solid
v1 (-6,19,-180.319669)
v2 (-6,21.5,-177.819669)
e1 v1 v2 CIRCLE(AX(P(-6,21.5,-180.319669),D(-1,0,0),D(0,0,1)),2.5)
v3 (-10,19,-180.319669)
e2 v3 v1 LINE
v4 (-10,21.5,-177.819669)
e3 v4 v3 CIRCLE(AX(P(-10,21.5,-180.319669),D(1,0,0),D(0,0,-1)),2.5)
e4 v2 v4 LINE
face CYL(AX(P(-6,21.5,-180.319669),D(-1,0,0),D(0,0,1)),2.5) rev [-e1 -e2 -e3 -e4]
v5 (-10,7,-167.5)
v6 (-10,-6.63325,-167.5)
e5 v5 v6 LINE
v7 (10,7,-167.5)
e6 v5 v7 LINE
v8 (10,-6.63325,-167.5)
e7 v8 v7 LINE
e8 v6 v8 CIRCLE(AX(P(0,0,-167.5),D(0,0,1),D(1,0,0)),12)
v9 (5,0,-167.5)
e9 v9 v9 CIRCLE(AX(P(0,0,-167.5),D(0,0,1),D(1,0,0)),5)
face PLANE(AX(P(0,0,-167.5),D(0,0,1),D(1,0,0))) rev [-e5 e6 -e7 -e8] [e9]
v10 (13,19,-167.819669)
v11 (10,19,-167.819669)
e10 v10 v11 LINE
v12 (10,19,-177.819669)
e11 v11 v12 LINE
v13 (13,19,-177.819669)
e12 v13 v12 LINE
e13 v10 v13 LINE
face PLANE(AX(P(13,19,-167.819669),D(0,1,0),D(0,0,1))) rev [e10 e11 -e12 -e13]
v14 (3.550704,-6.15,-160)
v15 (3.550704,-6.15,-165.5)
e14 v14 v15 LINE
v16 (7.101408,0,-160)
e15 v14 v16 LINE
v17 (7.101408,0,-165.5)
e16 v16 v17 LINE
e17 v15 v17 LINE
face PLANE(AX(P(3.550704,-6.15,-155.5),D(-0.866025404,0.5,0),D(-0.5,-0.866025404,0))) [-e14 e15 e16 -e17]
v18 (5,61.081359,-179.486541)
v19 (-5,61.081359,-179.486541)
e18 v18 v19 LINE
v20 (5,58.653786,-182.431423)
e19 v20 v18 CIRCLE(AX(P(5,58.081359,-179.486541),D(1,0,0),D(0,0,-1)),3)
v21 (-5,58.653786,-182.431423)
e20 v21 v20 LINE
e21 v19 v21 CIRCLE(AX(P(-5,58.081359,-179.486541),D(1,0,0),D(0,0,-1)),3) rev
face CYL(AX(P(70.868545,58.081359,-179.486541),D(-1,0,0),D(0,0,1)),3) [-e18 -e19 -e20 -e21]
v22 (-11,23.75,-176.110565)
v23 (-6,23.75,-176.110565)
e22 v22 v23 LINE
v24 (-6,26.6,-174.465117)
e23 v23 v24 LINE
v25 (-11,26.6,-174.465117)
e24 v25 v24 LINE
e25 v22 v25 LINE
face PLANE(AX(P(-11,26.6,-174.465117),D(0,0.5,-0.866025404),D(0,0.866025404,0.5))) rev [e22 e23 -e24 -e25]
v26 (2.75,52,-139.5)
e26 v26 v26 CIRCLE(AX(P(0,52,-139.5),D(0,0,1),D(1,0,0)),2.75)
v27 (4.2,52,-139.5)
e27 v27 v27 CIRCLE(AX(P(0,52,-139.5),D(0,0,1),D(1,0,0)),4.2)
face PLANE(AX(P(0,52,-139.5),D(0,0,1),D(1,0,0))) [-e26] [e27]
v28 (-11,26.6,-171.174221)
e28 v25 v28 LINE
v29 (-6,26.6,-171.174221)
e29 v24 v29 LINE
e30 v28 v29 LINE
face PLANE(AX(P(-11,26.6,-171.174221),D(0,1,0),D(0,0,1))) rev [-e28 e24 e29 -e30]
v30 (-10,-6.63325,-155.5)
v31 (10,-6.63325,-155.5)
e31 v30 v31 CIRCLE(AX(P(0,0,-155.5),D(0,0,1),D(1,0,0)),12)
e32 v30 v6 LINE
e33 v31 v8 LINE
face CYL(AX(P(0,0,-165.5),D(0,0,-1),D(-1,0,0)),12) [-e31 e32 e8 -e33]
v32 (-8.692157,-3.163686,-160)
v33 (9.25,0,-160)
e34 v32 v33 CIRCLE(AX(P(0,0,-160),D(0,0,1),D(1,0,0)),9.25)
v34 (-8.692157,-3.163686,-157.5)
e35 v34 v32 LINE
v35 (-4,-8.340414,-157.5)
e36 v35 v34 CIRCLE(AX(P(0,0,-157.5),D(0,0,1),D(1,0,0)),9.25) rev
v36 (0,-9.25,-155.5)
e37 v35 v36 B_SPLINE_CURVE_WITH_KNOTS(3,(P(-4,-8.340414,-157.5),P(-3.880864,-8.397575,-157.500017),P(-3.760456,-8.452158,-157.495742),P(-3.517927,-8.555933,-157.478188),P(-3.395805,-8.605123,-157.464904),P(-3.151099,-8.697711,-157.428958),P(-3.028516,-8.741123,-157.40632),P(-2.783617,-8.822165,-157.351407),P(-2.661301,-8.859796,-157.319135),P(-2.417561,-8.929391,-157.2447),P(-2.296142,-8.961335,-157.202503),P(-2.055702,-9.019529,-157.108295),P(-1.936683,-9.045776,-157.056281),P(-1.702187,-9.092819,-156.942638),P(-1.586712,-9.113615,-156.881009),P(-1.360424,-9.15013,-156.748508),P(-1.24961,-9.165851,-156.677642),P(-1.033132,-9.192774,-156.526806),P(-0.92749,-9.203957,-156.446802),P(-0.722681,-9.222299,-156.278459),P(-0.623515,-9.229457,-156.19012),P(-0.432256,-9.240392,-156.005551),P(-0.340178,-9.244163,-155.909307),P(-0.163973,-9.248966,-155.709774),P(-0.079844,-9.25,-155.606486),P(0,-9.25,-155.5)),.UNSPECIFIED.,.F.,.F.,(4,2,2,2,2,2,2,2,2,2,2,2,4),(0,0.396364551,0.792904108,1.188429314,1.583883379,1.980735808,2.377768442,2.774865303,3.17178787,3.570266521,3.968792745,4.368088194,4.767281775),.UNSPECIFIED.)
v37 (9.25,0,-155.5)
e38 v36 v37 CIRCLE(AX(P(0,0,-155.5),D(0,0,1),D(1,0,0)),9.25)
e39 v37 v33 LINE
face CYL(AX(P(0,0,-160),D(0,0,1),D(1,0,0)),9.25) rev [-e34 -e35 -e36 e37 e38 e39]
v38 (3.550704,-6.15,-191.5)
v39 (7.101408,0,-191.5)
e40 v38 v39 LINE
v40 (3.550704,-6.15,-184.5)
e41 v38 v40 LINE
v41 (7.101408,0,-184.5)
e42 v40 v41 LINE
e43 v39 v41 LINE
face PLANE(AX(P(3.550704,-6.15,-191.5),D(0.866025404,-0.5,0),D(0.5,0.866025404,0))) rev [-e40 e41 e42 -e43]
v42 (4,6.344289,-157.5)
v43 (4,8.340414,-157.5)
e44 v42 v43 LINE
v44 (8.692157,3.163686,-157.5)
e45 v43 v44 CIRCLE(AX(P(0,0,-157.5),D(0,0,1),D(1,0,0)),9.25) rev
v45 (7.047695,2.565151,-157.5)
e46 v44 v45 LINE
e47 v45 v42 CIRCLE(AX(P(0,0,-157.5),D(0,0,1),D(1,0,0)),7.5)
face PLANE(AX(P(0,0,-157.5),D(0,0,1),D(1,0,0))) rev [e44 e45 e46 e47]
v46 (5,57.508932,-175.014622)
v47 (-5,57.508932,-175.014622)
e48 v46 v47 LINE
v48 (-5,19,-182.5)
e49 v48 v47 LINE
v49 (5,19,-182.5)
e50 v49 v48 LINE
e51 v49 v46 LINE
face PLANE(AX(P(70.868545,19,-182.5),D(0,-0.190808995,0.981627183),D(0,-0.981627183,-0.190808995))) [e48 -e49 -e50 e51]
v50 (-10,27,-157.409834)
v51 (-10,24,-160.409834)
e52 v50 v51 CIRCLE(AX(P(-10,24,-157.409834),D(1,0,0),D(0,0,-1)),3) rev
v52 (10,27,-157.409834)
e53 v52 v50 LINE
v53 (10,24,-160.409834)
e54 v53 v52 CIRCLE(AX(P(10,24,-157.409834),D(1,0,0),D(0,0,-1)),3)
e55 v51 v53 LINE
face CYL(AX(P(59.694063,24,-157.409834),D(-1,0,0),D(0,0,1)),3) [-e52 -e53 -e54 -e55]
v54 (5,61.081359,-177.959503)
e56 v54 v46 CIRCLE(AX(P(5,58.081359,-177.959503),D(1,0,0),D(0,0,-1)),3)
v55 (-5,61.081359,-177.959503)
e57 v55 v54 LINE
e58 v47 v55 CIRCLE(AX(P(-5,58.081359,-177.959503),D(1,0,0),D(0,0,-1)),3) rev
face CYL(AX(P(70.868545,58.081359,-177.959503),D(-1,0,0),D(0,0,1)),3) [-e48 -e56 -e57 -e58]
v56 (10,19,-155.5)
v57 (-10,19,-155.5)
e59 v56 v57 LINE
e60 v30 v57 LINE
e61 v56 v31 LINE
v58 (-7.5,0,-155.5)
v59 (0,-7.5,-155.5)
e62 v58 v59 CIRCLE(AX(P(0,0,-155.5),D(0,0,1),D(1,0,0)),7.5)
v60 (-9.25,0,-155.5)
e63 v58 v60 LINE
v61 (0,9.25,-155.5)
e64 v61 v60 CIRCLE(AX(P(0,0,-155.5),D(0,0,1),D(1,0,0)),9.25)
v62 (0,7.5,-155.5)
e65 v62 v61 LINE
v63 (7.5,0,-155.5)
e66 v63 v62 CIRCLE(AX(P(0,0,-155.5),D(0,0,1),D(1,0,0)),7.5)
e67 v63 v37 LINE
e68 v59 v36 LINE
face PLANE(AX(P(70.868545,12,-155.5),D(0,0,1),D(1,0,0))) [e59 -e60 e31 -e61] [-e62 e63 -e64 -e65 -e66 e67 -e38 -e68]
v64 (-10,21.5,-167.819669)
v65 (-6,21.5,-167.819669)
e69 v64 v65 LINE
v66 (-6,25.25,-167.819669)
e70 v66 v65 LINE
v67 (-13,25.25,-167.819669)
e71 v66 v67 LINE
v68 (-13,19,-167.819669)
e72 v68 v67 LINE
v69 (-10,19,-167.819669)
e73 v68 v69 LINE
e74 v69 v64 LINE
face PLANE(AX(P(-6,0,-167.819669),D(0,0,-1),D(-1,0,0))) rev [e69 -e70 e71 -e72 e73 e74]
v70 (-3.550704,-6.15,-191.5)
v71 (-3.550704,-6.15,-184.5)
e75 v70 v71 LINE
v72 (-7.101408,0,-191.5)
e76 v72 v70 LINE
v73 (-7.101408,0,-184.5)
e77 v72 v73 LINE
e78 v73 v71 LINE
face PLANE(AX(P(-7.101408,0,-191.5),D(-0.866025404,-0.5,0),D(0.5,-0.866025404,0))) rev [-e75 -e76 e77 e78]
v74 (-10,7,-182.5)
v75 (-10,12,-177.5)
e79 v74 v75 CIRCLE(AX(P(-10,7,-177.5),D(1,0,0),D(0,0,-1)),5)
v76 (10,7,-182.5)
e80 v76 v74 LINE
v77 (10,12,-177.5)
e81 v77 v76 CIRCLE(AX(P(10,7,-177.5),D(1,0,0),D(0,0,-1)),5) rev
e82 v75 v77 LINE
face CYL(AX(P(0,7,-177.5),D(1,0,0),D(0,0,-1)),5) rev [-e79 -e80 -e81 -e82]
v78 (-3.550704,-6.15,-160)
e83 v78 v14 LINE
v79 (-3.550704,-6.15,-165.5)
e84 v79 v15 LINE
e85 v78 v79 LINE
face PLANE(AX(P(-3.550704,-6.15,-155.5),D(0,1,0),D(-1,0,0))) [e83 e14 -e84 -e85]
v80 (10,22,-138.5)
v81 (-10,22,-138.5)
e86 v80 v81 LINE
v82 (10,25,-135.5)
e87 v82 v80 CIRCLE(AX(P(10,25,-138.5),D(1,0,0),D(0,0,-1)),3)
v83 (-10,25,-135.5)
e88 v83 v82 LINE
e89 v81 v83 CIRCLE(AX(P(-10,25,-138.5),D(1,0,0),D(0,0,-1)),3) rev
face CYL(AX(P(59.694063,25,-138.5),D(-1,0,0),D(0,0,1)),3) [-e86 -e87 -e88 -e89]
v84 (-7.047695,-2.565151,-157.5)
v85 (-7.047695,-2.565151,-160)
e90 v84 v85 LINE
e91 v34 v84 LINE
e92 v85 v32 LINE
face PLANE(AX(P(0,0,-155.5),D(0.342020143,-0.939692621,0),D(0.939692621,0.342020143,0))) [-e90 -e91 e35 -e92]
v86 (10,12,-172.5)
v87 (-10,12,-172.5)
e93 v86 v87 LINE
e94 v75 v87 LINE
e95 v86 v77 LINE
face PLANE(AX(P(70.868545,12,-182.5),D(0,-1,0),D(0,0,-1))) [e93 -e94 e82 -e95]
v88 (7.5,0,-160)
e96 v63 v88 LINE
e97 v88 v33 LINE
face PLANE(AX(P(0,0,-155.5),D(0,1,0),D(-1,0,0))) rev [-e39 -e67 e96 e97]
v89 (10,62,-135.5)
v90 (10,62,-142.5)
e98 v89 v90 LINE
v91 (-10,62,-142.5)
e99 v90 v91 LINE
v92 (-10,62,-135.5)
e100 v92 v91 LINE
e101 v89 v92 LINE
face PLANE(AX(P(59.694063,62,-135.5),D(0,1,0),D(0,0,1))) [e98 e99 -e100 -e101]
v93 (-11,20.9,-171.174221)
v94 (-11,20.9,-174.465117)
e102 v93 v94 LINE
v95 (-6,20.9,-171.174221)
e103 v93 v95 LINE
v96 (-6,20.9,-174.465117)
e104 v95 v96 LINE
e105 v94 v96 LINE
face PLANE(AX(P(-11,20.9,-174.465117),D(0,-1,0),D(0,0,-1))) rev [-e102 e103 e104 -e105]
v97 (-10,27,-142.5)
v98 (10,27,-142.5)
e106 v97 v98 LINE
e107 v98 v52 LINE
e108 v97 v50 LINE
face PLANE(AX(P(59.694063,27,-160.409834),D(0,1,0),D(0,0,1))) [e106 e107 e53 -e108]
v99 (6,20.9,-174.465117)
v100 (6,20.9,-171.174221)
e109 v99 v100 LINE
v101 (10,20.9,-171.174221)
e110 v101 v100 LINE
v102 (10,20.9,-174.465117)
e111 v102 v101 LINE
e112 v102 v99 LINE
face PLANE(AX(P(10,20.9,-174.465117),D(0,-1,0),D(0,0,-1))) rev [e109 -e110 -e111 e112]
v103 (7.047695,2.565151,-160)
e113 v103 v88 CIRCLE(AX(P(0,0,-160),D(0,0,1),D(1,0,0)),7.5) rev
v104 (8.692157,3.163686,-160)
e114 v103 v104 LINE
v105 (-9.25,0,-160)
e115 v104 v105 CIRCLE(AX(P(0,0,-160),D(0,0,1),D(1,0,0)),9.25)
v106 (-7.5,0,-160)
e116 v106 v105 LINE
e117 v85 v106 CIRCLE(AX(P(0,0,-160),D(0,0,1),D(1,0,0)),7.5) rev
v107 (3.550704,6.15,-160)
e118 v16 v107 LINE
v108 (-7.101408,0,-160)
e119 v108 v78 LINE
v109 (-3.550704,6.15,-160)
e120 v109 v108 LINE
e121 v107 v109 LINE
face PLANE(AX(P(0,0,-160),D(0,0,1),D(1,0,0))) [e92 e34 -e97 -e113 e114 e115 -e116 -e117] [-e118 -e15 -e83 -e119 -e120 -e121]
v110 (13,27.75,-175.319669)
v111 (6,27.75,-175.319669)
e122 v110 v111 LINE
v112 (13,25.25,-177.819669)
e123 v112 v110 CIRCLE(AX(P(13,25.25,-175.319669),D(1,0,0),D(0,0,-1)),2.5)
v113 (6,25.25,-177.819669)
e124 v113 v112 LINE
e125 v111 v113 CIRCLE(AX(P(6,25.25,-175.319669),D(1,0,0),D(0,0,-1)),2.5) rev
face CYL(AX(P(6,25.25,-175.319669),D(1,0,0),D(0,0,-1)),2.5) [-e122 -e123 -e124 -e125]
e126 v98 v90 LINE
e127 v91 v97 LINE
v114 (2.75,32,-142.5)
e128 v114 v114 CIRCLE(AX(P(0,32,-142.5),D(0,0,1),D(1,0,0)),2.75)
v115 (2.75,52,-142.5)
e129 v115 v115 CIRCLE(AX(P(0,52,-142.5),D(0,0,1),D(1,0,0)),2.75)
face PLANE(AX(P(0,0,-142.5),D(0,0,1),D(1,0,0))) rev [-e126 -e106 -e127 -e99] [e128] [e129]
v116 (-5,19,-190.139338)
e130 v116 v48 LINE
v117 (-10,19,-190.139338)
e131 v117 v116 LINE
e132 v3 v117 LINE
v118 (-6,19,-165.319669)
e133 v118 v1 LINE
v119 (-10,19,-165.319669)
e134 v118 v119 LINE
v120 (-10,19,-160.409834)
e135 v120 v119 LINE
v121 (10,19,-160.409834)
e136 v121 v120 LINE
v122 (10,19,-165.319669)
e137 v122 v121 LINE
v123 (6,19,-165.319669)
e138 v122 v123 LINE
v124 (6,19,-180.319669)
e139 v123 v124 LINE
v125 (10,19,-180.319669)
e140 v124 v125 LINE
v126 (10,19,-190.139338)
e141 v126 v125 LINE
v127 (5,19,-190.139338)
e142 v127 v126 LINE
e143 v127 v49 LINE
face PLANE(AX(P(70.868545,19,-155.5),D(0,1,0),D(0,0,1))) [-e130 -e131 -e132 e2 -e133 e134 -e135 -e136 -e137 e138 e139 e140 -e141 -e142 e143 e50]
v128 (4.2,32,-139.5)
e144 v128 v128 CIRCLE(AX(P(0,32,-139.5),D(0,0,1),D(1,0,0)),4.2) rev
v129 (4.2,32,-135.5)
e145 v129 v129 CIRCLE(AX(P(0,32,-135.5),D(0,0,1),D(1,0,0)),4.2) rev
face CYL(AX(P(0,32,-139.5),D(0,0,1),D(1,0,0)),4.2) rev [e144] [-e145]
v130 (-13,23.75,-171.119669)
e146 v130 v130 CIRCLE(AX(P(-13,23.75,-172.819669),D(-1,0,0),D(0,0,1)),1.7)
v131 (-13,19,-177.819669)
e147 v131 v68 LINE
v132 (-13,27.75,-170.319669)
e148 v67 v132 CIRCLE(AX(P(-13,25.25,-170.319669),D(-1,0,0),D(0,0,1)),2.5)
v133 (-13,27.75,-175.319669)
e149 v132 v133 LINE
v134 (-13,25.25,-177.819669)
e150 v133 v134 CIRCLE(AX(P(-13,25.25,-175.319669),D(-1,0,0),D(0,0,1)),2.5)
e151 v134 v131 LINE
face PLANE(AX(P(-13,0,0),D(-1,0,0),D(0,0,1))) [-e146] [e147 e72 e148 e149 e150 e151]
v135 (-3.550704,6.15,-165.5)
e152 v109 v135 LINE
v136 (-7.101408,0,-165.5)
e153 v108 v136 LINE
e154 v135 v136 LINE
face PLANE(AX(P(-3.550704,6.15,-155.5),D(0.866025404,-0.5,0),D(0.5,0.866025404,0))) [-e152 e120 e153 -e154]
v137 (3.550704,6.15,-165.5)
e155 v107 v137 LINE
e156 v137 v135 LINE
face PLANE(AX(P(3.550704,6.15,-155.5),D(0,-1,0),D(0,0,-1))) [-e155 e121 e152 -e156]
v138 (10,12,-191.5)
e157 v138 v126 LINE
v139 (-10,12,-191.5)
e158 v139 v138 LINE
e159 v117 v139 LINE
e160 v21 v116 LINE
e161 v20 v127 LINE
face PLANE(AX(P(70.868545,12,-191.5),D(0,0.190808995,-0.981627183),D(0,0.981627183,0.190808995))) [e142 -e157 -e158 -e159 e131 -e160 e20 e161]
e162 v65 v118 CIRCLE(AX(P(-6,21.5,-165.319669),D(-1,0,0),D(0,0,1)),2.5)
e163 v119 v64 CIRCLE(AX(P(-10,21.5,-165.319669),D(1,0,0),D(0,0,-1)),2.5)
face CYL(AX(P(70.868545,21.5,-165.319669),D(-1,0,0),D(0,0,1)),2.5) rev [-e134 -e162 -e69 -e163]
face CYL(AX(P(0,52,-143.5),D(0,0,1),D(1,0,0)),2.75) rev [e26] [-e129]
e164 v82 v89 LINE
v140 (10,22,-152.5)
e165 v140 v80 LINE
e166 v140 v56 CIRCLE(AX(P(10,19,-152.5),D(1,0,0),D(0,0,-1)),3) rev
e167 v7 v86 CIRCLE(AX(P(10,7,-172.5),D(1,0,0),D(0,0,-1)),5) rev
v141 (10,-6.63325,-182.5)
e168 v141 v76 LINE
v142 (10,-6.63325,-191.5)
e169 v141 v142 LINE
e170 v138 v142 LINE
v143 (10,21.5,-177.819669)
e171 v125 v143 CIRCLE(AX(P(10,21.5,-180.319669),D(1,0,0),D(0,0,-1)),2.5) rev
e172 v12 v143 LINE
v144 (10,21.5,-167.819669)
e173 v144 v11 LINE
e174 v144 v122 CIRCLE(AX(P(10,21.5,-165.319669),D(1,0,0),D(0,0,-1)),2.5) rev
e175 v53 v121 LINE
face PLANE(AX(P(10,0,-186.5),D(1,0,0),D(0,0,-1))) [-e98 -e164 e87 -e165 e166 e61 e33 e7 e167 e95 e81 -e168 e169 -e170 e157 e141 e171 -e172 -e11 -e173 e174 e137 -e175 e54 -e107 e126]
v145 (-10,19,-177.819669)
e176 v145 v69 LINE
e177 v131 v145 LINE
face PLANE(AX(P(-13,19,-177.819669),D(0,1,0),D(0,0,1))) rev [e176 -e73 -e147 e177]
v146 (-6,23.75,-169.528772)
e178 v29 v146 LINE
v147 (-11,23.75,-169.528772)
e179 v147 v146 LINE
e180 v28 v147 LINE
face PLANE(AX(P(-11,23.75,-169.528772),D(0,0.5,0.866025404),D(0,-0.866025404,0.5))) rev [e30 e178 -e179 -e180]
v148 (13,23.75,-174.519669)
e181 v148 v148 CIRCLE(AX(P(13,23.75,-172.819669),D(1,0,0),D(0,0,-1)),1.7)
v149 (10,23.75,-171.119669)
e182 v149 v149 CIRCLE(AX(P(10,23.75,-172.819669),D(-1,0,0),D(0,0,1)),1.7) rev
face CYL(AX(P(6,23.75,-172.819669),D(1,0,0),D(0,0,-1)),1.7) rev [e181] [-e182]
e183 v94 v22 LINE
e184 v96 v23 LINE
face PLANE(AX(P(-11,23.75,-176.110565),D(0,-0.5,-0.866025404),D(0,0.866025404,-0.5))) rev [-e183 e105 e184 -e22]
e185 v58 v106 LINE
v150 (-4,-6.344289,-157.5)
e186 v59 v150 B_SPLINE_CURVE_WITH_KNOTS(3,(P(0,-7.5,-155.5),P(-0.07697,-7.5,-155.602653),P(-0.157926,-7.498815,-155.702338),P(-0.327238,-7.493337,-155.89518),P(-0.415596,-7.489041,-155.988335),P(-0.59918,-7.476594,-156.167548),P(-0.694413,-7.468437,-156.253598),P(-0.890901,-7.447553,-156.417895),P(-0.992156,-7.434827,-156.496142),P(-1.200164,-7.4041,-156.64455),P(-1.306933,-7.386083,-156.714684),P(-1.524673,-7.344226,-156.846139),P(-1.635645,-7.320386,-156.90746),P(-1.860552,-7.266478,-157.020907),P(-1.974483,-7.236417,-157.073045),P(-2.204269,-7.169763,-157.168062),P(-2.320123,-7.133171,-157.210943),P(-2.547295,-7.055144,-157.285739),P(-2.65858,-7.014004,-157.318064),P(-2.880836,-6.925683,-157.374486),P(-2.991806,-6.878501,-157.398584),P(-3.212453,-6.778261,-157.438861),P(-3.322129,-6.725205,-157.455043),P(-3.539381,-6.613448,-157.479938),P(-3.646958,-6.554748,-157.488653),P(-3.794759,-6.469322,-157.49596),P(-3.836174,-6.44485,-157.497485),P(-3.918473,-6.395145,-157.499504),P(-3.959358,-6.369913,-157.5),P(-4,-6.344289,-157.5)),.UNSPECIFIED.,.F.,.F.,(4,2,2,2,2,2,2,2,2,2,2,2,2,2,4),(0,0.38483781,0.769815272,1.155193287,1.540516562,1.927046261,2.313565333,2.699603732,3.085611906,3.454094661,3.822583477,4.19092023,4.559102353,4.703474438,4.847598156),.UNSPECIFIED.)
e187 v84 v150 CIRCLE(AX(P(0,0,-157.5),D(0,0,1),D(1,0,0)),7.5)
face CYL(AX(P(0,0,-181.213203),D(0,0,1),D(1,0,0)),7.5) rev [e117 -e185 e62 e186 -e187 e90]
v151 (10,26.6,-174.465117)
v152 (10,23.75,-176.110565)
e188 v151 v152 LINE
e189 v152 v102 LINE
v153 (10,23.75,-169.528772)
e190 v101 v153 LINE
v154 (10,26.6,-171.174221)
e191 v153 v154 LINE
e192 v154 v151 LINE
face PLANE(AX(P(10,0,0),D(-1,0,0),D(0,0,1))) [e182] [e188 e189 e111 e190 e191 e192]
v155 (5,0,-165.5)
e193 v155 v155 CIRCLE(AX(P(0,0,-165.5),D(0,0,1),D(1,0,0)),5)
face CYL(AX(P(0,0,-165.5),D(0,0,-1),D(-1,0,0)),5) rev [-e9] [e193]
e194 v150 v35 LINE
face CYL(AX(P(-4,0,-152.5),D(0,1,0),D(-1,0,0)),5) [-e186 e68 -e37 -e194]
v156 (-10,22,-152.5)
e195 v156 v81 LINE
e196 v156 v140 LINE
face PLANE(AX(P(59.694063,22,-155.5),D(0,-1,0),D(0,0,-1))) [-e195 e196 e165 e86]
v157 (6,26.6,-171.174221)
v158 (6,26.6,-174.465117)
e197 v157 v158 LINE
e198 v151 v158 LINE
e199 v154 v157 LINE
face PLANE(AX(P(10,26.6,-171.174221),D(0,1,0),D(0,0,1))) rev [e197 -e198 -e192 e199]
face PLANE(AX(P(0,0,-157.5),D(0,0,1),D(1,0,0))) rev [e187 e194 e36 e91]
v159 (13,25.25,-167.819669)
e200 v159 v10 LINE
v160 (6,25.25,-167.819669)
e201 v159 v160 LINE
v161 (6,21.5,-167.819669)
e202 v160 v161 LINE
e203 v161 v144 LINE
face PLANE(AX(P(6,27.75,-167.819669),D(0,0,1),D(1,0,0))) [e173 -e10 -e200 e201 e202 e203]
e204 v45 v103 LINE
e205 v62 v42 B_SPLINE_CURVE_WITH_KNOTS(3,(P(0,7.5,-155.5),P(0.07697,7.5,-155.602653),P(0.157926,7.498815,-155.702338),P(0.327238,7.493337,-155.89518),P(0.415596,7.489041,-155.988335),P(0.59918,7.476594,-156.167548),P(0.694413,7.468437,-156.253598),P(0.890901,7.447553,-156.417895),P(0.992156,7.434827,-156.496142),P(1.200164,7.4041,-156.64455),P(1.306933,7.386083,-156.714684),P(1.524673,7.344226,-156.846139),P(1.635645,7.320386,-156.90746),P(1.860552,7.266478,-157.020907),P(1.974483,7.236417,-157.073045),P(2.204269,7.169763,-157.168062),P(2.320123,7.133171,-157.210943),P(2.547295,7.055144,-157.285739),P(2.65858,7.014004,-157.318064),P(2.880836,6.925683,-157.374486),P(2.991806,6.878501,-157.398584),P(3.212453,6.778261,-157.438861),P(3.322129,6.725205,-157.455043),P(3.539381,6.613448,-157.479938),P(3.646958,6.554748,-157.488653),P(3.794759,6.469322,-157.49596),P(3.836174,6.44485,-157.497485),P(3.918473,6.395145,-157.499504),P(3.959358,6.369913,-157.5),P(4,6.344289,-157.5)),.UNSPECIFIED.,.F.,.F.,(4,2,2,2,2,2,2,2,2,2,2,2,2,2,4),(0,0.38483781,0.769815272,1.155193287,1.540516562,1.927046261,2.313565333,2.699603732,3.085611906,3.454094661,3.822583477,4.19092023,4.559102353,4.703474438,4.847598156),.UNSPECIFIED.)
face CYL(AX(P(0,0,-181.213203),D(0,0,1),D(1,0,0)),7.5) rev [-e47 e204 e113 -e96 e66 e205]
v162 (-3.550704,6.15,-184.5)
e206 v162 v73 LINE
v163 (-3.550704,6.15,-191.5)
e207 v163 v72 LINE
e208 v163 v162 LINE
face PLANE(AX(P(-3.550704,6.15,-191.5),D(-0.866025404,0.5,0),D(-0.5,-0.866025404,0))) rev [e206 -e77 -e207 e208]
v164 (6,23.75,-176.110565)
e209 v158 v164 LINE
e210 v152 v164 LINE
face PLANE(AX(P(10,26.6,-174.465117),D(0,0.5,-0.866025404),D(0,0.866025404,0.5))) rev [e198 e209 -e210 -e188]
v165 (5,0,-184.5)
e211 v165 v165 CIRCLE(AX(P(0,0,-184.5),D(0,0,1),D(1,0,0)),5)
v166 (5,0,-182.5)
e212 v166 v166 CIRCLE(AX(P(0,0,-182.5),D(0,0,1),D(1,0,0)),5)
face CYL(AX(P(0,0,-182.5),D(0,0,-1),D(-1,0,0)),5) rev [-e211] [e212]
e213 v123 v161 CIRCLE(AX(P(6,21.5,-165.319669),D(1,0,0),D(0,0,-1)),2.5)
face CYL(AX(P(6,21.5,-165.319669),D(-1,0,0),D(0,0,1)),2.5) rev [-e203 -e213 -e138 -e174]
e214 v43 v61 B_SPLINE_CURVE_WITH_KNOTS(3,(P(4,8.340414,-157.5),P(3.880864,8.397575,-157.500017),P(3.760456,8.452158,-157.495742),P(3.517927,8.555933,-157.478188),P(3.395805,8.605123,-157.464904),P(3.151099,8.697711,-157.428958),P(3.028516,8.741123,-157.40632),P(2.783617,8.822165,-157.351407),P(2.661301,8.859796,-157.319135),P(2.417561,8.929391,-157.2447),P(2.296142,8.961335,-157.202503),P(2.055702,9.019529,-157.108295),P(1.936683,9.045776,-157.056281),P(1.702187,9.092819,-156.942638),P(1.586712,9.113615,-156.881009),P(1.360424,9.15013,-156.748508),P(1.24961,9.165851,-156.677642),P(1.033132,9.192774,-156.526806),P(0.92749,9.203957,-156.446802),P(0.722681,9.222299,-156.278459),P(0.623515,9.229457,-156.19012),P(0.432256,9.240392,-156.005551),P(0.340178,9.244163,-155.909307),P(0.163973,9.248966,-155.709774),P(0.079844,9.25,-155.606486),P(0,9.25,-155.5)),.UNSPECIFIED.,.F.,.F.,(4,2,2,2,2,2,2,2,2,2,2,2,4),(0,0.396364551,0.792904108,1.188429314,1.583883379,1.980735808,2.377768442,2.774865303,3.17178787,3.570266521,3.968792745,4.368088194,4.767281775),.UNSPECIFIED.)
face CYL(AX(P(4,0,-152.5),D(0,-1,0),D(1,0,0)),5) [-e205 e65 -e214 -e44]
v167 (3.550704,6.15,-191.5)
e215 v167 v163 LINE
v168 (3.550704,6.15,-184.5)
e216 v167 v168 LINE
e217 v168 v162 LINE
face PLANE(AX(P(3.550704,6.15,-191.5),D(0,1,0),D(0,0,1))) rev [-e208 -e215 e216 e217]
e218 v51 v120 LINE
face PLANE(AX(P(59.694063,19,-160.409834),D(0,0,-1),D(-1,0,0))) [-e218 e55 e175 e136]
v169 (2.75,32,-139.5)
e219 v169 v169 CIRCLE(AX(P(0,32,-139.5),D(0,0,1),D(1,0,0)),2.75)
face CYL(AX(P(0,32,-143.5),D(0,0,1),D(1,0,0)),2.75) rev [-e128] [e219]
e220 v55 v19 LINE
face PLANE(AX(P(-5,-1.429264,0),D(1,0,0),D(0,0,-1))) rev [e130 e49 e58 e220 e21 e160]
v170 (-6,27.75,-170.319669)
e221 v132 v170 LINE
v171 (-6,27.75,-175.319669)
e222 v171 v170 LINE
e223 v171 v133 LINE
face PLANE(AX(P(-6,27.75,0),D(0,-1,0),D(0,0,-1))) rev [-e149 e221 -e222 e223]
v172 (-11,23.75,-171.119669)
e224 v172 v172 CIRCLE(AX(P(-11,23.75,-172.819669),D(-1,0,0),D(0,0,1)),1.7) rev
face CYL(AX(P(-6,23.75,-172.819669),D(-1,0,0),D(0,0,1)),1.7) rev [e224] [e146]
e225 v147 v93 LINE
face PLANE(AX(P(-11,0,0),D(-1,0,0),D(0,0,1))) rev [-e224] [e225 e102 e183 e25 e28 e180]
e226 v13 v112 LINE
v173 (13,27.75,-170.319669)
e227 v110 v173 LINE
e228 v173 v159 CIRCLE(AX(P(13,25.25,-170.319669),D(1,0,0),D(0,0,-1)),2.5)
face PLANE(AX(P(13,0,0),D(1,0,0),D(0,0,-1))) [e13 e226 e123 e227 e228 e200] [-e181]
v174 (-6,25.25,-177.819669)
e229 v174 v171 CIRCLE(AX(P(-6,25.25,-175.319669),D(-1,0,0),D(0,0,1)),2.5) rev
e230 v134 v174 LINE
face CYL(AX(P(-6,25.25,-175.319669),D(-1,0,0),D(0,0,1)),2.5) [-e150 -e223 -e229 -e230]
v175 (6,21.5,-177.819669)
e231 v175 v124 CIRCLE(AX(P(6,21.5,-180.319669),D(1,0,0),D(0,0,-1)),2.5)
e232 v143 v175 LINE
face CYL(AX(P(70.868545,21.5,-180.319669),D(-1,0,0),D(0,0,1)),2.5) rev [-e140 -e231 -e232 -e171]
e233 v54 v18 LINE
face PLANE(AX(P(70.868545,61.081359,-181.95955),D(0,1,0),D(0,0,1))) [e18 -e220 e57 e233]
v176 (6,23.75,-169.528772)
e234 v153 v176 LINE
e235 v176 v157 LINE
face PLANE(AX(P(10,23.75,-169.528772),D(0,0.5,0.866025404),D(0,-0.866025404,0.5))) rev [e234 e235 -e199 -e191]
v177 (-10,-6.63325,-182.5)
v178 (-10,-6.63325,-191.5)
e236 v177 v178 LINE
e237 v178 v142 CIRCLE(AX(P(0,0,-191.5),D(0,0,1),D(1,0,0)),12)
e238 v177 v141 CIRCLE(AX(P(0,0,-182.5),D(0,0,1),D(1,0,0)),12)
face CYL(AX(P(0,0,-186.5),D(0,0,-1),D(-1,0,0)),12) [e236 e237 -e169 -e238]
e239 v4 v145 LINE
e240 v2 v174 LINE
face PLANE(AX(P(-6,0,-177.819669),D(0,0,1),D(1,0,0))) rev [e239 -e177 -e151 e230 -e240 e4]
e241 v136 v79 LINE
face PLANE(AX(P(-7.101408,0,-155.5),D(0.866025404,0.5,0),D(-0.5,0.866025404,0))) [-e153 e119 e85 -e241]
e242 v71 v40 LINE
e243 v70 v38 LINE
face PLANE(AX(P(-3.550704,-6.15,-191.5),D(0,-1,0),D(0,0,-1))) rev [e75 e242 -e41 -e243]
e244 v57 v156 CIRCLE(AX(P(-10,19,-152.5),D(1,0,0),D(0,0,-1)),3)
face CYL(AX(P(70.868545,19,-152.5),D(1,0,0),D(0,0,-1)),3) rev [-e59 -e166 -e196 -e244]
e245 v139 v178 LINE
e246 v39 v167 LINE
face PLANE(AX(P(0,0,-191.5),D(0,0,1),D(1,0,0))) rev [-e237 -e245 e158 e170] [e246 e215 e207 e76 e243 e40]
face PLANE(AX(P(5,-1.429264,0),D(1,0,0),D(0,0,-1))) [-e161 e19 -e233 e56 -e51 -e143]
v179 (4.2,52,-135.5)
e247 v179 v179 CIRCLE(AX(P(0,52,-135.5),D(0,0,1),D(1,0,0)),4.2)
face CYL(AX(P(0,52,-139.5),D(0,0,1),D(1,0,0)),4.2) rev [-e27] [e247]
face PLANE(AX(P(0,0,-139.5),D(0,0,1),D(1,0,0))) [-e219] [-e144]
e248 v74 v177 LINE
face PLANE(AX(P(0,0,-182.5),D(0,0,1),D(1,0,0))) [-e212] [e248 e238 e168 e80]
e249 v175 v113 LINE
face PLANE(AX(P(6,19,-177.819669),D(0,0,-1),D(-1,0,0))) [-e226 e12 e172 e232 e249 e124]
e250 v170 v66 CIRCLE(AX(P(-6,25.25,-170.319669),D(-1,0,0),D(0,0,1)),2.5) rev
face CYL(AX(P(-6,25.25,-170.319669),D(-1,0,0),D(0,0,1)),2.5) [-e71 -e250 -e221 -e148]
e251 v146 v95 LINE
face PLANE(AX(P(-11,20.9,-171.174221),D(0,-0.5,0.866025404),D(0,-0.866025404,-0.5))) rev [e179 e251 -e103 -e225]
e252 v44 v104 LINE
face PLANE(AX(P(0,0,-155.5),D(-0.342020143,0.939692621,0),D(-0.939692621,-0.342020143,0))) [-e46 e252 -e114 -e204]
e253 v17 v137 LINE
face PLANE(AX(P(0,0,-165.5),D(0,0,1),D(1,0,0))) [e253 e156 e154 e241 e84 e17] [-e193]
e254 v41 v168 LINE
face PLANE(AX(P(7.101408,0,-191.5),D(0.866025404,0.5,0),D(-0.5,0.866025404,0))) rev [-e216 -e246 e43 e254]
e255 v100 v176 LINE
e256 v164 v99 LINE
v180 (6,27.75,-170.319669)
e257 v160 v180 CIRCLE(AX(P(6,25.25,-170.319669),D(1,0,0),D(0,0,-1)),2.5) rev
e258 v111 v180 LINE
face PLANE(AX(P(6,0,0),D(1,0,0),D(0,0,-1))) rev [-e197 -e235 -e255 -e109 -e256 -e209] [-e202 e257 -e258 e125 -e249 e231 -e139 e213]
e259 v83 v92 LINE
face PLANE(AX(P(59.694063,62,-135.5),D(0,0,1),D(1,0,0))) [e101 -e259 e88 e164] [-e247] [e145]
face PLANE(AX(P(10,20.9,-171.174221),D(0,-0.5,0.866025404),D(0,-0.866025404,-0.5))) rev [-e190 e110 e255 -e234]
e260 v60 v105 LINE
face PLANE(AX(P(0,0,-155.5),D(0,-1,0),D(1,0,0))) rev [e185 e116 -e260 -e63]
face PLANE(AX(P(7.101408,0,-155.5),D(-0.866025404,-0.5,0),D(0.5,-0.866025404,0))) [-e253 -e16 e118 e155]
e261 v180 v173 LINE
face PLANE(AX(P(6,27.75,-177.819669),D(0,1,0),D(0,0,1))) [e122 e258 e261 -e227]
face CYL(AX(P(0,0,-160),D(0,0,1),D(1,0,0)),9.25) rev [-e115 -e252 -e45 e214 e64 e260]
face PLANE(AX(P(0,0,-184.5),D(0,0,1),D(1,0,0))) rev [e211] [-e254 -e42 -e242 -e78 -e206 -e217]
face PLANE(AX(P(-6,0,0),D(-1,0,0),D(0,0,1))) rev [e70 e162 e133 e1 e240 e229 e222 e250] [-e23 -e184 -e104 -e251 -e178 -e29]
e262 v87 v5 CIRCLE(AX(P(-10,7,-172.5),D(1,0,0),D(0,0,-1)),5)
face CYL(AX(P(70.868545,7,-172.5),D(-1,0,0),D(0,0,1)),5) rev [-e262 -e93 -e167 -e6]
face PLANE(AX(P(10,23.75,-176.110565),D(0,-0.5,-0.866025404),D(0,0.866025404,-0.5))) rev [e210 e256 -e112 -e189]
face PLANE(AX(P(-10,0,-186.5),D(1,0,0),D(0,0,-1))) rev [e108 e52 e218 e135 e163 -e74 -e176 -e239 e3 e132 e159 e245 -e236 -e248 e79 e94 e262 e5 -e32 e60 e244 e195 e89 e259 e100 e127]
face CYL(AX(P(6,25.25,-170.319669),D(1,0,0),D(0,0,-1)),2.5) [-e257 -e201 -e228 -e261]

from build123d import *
from build123d.topology import SkipClean

# Parameters (mm, degrees)
BOSS_EXTRUDE1_DEPTH  = 5
CUT_EXTRUDE1_DEPTH   = 17.401219467
BOSS_EXTRUDE2_DEPTH  = 2
SKETCH6_R            = 5
BOSS_EXTRUDE3_DEPTH  = 2
SKETCH7_R            = 5
BOSS_EXTRUDE4_DEPTH  = 2
BOSS_EXTRUDE5_DEPTH  = 10
SKETCH9_R            = 7.5
CUT_EXTRUDE2_DEPTH   = 4.5
SKETCH11_R           = 9.25
CUT_EXTRUDE3_DEPTH   = 4.5
BOSS_EXTRUDE6_DEPTH  = 4.5
BOSS_EXTRUDE7_DEPTH  = 2
FILLET1_R            = 5
CUT_EXTRUDE4_START   = -4.5
SKETCH15_R           = 7.5
CUT_EXTRUDE4_DEPTH   = 4.5
BOSS_EXTRUDE8_DEPTH  = 20
FILLET2_R            = 5
SKETCH17_W           = 5
SKETCH17_H           = 9.540449769
SKETCH17_H_2         = 7.639337836
SKETCH17_H_3         = 12.1686109
CUT_EXTRUDE5_DEPTH   = 42.081359172
FILLET3_R            = 3
BOSS_EXTRUDE9_DEPTH  = 4
BOSS_EXTRUDE10_START = -4
SKETCH19_W           = 10
SKETCH19_H           = 8.75
SKETCH19_R           = 1.7
BOSS_EXTRUDE10_DEPTH = 4
BOSS_EXTRUDE11_START = 3
SKETCH20_W           = 10
SKETCH20_H           = 8.75
SKETCH20_R           = 1.7
BOSS_EXTRUDE11_DEPTH = 3
SKETCH21_W           = 10
SKETCH21_H           = 8.75
SKETCH21_R           = 1.7
BOSS_EXTRUDE12_DEPTH = 3
CUT_EXTRUDE6_DEPTH   = 4
CUT_EXTRUDE7_DEPTH   = 5
FILLET5_R            = 2.5
BOSS_EXTRUDE14_DEPTH = 20
SKETCH27_W           = 20
SKETCH27_H           = 40
BOSS_EXTRUDE16_DEPTH = 7
SKETCH28_R           = 4.2
CUT_EXTRUDE8_DEPTH   = 4
SKETCH29_R           = 2.75
CUT_EXTRUDE9_DEPTH   = 4
FILLET6_R            = 3


with BuildPart() as part:
    # Sketch2 → Boss-Extrude1 (new body)
    # profile 1 of 2: a face of its own
    with BuildSketch(Plane.XY.offset(-191.5)):
        with BuildLine():
            Line((10, 12), (0, 12))
            ThreePointArc((0, 12), (-5.674548662, 10.573528147), (-10, 6.633249581))
            Line((-10, 6.633249581), (-10, -6.633249581))
            ThreePointArc((-10, -6.633249581), (0, -12), (10, -6.633249581))
            Line((10, -6.633249581), (10, 12))
        make_face()
        Polygon((6.92820323, 0), (3.464101615, -6), (-3.464101615, -6), (-6.92820323, 0), (-3.464101615, 6), (3.464101615, 6), align=None, mode=Mode.SUBTRACT)
    # profile 2 of 2: a face of its own
    with BuildSketch(Plane.XY.offset(-191.5)):
        with BuildLine():
            ThreePointArc((-10, 6.633249581), (-5.674548662, 10.573528147), (0, 12))
            Line((0, 12), (-10, 12))
            Line((-10, 12), (-10, 6.633249581))
        make_face()
    extrude(amount=BOSS_EXTRUDE1_DEPTH)

    # Sketch3 → Cut-Extrude1 (cut, through all)
    with BuildSketch(Plane.XY.offset(-186.5)):
        Polygon((7.101408311, 0), (3.550704156, 6.15), (-3.550704156, 6.15), (-7.101408311, 0), (-3.550704156, -6.15), (3.550704156, -6.15), align=None)
    extrude(amount=-CUT_EXTRUDE1_DEPTH, mode=Mode.SUBTRACT)

    # Sketch5 → Boss-Extrude2 (add)
    with BuildSketch(Plane.XY.offset(-186.5)):
        with BuildLine():
            Line((10, 12), (-10, 12))
            Line((-10, 12), (-10, -6.633249581))
            ThreePointArc((-10, -6.633249581), (0, -12), (10, -6.633249581))
            Line((10, -6.633249581), (10, 12))
        make_face()
        Polygon((-3.550704156, -6.15), (3.550704156, -6.15), (7.101408311, 0), (3.550704156, 6.15), (-3.550704156, 6.15), (-7.101408311, 0), align=None, mode=Mode.SUBTRACT)
    extrude(amount=BOSS_EXTRUDE2_DEPTH)

    # Sketch6 → Boss-Extrude3 (add)
    with BuildSketch(Plane.XY.offset(-184.5)):
        with BuildLine():
            Line((10, -6.633249581), (10, 12))
            Line((10, 12), (-10, 12))
            Line((-10, 12), (-10, -6.633249581))
            ThreePointArc((-10, -6.633249581), (0, -12), (10, -6.633249581))
        make_face()
        Circle(SKETCH6_R, mode=Mode.SUBTRACT)
    extrude(amount=BOSS_EXTRUDE3_DEPTH)



with BuildPart() as body_2:
    # Sketch7 → Boss-Extrude4 (new body)
    with BuildSketch(Plane.XY.offset(-167.5)):
        with BuildLine():
            Line((10, -6.633249581), (10, 12))
            Line((10, 12), (-10, 12))
            Line((-10, 12), (-10, -6.633249581))
            ThreePointArc((-10, -6.633249581), (0, -12), (10, -6.633249581))
        make_face()
        Circle(SKETCH7_R, mode=Mode.SUBTRACT)
    extrude(amount=BOSS_EXTRUDE4_DEPTH)

    # Sketch8 → Boss-Extrude5 (add)
    with BuildSketch(Plane.XY.offset(-165.5)):
        with BuildLine():
            Line((10, -6.633249581), (10, 12))
            Line((10, 12), (-10, 12))
            Line((-10, 12), (-10, -6.633249581))
            ThreePointArc((-10, -6.633249581), (0, -12), (10, -6.633249581))
        make_face()
        Polygon((7.101408311, 0), (3.550704156, 6.15), (-3.550704156, 6.15), (-7.101408311, 0), (-3.550704156, -6.15), (3.550704156, -6.15), align=None, mode=Mode.SUBTRACT)
    extrude(amount=BOSS_EXTRUDE5_DEPTH)

    # Sketch9 → Cut-Extrude2 (cut)
    with BuildSketch(Plane.XY.offset(-155.5)):
        Circle(SKETCH9_R)
    extrude(amount=-CUT_EXTRUDE2_DEPTH, mode=Mode.SUBTRACT)

    # Sketch11 → Cut-Extrude3 (cut)
    with BuildSketch(Plane.XY.offset(-155.5)):
        Circle(SKETCH11_R)
    extrude(amount=-CUT_EXTRUDE3_DEPTH, mode=Mode.SUBTRACT)

    # Sketch13 → Boss-Extrude6 (add)
    with BuildSketch(Plane.XY.offset(-160)):
        with BuildLine():
            Line((5.868261699, 2.135872585), (7.101408311, 0))
            Line((7.101408311, 0), (9.25, 0))
            ThreePointArc((9.25, 0), (9.109471715, 1.606245643), (8.692156742, 3.163686326))
            Line((8.692156742, 3.163686326), (5.868261699, 2.135872585))
        make_face()
        with BuildLine():
            Line((-5.868261699, -2.135872585), (-7.101408311, 0))
            Line((-7.101408311, 0), (-9.25, 0))
            ThreePointArc((-9.25, 0), (-9.109471715, -1.606245643), (-8.692156742, -3.163686326))
            Line((-8.692156742, -3.163686326), (-5.868261699, -2.135872585))
        make_face()
    extrude(amount=BOSS_EXTRUDE6_DEPTH)

    # Sketch14 → Boss-Extrude7 (add)
    with BuildSketch(Plane.XY.offset(-155.5)):
        with BuildLine():
            Line((0, 9.25), (0, 6.15))
            Line((0, 6.15), (3.550704156, 6.15))
            Line((3.550704156, 6.15), (5.868261699, 2.135872585))
            Line((5.868261699, 2.135872585), (8.692156742, 3.163686326))
            ThreePointArc((8.692156742, 3.163686326), (5.305582036, 7.57715641), (0, 9.25))
        make_face()
        with BuildLine():
            Line((0, -9.25), (0, -6.15))
            Line((0, -6.15), (-3.550704156, -6.15))
            Line((-3.550704156, -6.15), (-5.868261699, -2.135872585))
            Line((-5.868261699, -2.135872585), (-8.692156742, -3.163686326))
            ThreePointArc((-8.692156742, -3.163686326), (-5.305582036, -7.57715641), (0, -9.25))
        make_face()
    extrude(amount=-BOSS_EXTRUDE7_DEPTH)

    # Fillet1
    # the kernel refuses this fillet: 5 mm, written as the material it takes off along each edge
    with BuildSketch(Plane(origin=(0, -19.25, -157.5), x_dir=(-1, 0, 0), z_dir=(0, 1, 0))) as fillet1_piece_1_section:
        with BuildLine():
            CenterArc((4, 5), FILLET1_R, 216.869897646, 53.130102354)
            Line((0, 2), (0, 0))
            Line((0, 0), (4, 0))
        make_face()
    fillet1_piece_1 = extrude(amount=23.1, mode=Mode.PRIVATE)
    fillet1_piece_1 = fillet1_piece_1 & Plane(origin=(0, 0, -157.389372656), x_dir=(1, 0, 0), z_dir=(0, 0, 1)) * Cylinder(9.25, 63, mode=Mode.PRIVATE)
    add(fillet1_piece_1, mode=Mode.SUBTRACT)
    with BuildSketch(Plane(origin=(0, 19.25, -157.5), x_dir=(0, 0, 1), z_dir=(0, -1, 0))) as fillet1_piece_2_section:
        with BuildLine():
            CenterArc((5, -4), FILLET1_R, 126.869897646, 53.130102354)
            Line((0, -4), (0, 0))
            Line((0, 0), (2, 0))
        make_face()
    fillet1_piece_2 = extrude(amount=23.1, mode=Mode.PRIVATE)
    fillet1_piece_2 = fillet1_piece_2 & Plane(origin=(0, 0, -157.389372656), x_dir=(1, 0, 0), z_dir=(0, 0, 1)) * Cylinder(9.25, 63, mode=Mode.PRIVATE)
    add(fillet1_piece_2, mode=Mode.SUBTRACT)

    # Sketch15 → Cut-Extrude4 (cut)
    with BuildSketch(Plane.XY.offset(-155.5).offset(CUT_EXTRUDE4_START)):
        Circle(SKETCH15_R)
    extrude(amount=CUT_EXTRUDE4_DEPTH, mode=Mode.SUBTRACT)


with BuildPart() as part_1:
    add(part.part)

    add(body_2.part)  # Boss-Extrude8 merges body 2
    # Sketch16 → Boss-Extrude8 (add)
    with BuildSketch(Plane.ZY.offset(10)):
        Polygon((-191.5, 12), (-181.959550231, 61.081359172), (-174.320212395, 61.081359172), (-182.5, 19), (-155.5, 19), (-155.5, 12), (-182.5, 12), align=None)
    extrude(amount=-BOSS_EXTRUDE8_DEPTH)

    # Fillet2
    fillet2_edges = [part_1.edges().sort_by_distance(p)[0] for p in [
        (0, 12, -167.5),
        (0, 12, -182.5),
    ]]
    fillet(fillet2_edges, radius=FILLET2_R)

    # Sketch17 → Cut-Extrude5 (cut)
    with BuildSketch(Plane(origin=(0, 61.081359172, 0), x_dir=(1, 0, 0), z_dir=(0, 1, 0))):
        with Locations((-7.5, 186.729775115)):
            Rectangle(SKETCH17_W, SKETCH17_H)
        with Locations((-7.5, 178.139881313)):
            Rectangle(SKETCH17_W, SKETCH17_H_2)
        with Locations((7.5, 178.139881313)):
            Rectangle(SKETCH17_W, SKETCH17_H_2)
        with Locations((7.5, 188.043855681)):
            Rectangle(SKETCH17_W, SKETCH17_H_3)
    extrude(amount=-CUT_EXTRUDE5_DEPTH, mode=Mode.SUBTRACT)

    # Fillet3
    fillet3_edges = [part_1.edges().sort_by_distance(p)[0] for p in [
        (0, 61.081359172, -174.320212395),
        (0, 61.081359172, -181.959550231),
    ]]
    fillet(fillet3_edges, radius=FILLET3_R)

    # Sketch18 → Boss-Extrude9 (add)
    with BuildSketch(Plane.ZY.offset(10)):
        with BuildLine():
            Line((-172.819668918, 19.75), (-172.819668918, 19))
            Line((-172.819668918, 19), (-167.819668918, 19))
            Line((-167.819668918, 19), (-167.819668918, 27.75))
            Line((-167.819668918, 27.75), (-172.819668918, 27.75))
            Line((-172.819668918, 27.75), (-172.819668918, 25.45))
            ThreePointArc((-172.819668918, 25.45), (-171.61758739, 24.952081528), (-171.119668918, 23.75))
            ThreePointArc((-171.119668918, 23.75), (-171.61758739, 22.547918472), (-172.819668918, 22.05))
            Line((-172.819668918, 22.05), (-172.819668918, 19.75))
        make_face()
        with BuildLine():
            Line((-177.819668918, 19), (-172.819668918, 19))
            Line((-172.819668918, 19), (-172.819668918, 19.75))
            Line((-172.819668918, 19.75), (-172.819668918, 22.05))
            ThreePointArc((-172.819668918, 22.05), (-174.519668918, 23.75), (-172.819668918, 25.45))
            Line((-172.819668918, 25.45), (-172.819668918, 27.75))
            Line((-172.819668918, 27.75), (-177.819668918, 27.75))
            Line((-177.819668918, 27.75), (-177.819668918, 19))
        make_face()
    extrude(amount=-BOSS_EXTRUDE9_DEPTH)

    # Sketch19 → Boss-Extrude10 (add)
    with BuildSketch(Plane(origin=(10, 0, 0), x_dir=(0, 0, -1), z_dir=(1, 0, 0)).offset(BOSS_EXTRUDE10_START)):
        with Locations((172.819668918, 23.375)):
            Rectangle(SKETCH19_W, SKETCH19_H)
        with Locations(Location((172.819668918, 23.75, 0), (0, 0, 180))):
            Circle(SKETCH19_R, mode=Mode.SUBTRACT)
    extrude(amount=BOSS_EXTRUDE10_DEPTH)

    # Sketch20 → Boss-Extrude11 (add)
    with SkipClean():  # the faces are left unmerged after this step: merging them gives an invalid solid
        with BuildSketch(Plane.ZY.offset(10).offset(BOSS_EXTRUDE11_START)):
            with Locations((-172.819668918, 23.375)):
                Rectangle(SKETCH20_W, SKETCH20_H)
            with Locations((-172.819668918, 23.75)):
                Circle(SKETCH20_R, mode=Mode.SUBTRACT)
        extrude(amount=-BOSS_EXTRUDE11_DEPTH)

    # Sketch21 → Boss-Extrude12 (add)
    with SkipClean():  # the faces are left unmerged after this step: merging them gives an invalid solid
        with BuildSketch(Plane(origin=(10, 0, 0), x_dir=(0, 0, -1), z_dir=(1, 0, 0))):
            with Locations((172.819668918, 23.375)):
                Rectangle(SKETCH21_W, SKETCH21_H)
            with Locations(Location((172.819668918, 23.75, 0), (0, 0, 180))):
                Circle(SKETCH21_R, mode=Mode.SUBTRACT)
        extrude(amount=BOSS_EXTRUDE12_DEPTH)

    # Sketch22 → Cut-Extrude6 (cut)
    with SkipClean():  # the faces are left unmerged after this step: merging them gives an invalid solid
        with BuildSketch(Plane.ZY.offset(-6)):
            Polygon((-169.528772384, 23.75), (-171.174220651, 26.6), (-174.465117185, 26.6), (-176.110565452, 23.75), (-174.465117185, 20.9), (-171.174220651, 20.9), align=None)
        extrude(amount=-CUT_EXTRUDE6_DEPTH, mode=Mode.SUBTRACT)

    # Sketch23 → Cut-Extrude7 (cut)
    with BuildSketch(Plane(origin=(-6, 0, 0), x_dir=(0, 0, -1), z_dir=(1, 0, 0))):
        Polygon((169.528772384, 23.75), (171.174220651, 26.6), (174.465117185, 26.6), (176.110565452, 23.75), (174.465117185, 20.9), (171.174220651, 20.9), align=None)
    extrude(amount=-CUT_EXTRUDE7_DEPTH, mode=Mode.SUBTRACT)

    # Fillet5
    fillet5_edges = [part_1.edges().sort_by_distance(p)[0] for p in [
        (-8, 19, -177.819668918),
        (-9.5, 27.75, -177.819668918),
        (-9.5, 27.75, -167.819668918),
        (-8, 19, -167.819668918),
        (8, 19, -177.819668918),
        (8, 19, -167.819668918),
        (9.5, 27.75, -167.819668918),
        (9.5, 27.75, -177.819668918),
    ]]
    fillet(fillet5_edges, radius=FILLET5_R)

    # Sketch25 → Boss-Extrude14 (add)
    with BuildSketch(Plane.ZY.offset(10)):
        Polygon((-160.409834459, 19), (-160.409834459, 27), (-139.5, 27), (-139.5, 62), (-135.5, 62), (-135.5, 22), (-155.5, 22), (-155.5, 19), align=None)
    extrude(amount=-BOSS_EXTRUDE14_DEPTH)

    # Sketch27 → Boss-Extrude16 (add)
    with BuildSketch(Plane.XY.offset(-135.5)):
        with Locations((0, 42)):
            Rectangle(SKETCH27_W, SKETCH27_H)
    extrude(amount=-BOSS_EXTRUDE16_DEPTH)

    # Sketch28 → Cut-Extrude8 (cut)
    with BuildSketch(Plane.XY.offset(-135.5)):
        with Locations((0, 32)):
            Circle(SKETCH28_R)
        with Locations((0, 52)):
            Circle(SKETCH28_R)
    extrude(amount=-CUT_EXTRUDE8_DEPTH, mode=Mode.SUBTRACT)

    # Sketch29 → Cut-Extrude9 (cut)
    with BuildSketch(Plane.XY.offset(-139.5)):
        with Locations((0, 32)):
            Circle(SKETCH29_R)
        with Locations((0, 52)):
            Circle(SKETCH29_R)
    extrude(amount=-CUT_EXTRUDE9_DEPTH, mode=Mode.SUBTRACT)

    # Fillet6
    fillet6_edges = [part_1.edges().sort_by_distance(p)[0] for p in [
        (0, 22, -155.5),
        (0, 22, -135.5),
        (0, 27, -160.409834459),
    ]]
    fillet(fillet6_edges, radius=FILLET6_R)


solid = part_1.part
